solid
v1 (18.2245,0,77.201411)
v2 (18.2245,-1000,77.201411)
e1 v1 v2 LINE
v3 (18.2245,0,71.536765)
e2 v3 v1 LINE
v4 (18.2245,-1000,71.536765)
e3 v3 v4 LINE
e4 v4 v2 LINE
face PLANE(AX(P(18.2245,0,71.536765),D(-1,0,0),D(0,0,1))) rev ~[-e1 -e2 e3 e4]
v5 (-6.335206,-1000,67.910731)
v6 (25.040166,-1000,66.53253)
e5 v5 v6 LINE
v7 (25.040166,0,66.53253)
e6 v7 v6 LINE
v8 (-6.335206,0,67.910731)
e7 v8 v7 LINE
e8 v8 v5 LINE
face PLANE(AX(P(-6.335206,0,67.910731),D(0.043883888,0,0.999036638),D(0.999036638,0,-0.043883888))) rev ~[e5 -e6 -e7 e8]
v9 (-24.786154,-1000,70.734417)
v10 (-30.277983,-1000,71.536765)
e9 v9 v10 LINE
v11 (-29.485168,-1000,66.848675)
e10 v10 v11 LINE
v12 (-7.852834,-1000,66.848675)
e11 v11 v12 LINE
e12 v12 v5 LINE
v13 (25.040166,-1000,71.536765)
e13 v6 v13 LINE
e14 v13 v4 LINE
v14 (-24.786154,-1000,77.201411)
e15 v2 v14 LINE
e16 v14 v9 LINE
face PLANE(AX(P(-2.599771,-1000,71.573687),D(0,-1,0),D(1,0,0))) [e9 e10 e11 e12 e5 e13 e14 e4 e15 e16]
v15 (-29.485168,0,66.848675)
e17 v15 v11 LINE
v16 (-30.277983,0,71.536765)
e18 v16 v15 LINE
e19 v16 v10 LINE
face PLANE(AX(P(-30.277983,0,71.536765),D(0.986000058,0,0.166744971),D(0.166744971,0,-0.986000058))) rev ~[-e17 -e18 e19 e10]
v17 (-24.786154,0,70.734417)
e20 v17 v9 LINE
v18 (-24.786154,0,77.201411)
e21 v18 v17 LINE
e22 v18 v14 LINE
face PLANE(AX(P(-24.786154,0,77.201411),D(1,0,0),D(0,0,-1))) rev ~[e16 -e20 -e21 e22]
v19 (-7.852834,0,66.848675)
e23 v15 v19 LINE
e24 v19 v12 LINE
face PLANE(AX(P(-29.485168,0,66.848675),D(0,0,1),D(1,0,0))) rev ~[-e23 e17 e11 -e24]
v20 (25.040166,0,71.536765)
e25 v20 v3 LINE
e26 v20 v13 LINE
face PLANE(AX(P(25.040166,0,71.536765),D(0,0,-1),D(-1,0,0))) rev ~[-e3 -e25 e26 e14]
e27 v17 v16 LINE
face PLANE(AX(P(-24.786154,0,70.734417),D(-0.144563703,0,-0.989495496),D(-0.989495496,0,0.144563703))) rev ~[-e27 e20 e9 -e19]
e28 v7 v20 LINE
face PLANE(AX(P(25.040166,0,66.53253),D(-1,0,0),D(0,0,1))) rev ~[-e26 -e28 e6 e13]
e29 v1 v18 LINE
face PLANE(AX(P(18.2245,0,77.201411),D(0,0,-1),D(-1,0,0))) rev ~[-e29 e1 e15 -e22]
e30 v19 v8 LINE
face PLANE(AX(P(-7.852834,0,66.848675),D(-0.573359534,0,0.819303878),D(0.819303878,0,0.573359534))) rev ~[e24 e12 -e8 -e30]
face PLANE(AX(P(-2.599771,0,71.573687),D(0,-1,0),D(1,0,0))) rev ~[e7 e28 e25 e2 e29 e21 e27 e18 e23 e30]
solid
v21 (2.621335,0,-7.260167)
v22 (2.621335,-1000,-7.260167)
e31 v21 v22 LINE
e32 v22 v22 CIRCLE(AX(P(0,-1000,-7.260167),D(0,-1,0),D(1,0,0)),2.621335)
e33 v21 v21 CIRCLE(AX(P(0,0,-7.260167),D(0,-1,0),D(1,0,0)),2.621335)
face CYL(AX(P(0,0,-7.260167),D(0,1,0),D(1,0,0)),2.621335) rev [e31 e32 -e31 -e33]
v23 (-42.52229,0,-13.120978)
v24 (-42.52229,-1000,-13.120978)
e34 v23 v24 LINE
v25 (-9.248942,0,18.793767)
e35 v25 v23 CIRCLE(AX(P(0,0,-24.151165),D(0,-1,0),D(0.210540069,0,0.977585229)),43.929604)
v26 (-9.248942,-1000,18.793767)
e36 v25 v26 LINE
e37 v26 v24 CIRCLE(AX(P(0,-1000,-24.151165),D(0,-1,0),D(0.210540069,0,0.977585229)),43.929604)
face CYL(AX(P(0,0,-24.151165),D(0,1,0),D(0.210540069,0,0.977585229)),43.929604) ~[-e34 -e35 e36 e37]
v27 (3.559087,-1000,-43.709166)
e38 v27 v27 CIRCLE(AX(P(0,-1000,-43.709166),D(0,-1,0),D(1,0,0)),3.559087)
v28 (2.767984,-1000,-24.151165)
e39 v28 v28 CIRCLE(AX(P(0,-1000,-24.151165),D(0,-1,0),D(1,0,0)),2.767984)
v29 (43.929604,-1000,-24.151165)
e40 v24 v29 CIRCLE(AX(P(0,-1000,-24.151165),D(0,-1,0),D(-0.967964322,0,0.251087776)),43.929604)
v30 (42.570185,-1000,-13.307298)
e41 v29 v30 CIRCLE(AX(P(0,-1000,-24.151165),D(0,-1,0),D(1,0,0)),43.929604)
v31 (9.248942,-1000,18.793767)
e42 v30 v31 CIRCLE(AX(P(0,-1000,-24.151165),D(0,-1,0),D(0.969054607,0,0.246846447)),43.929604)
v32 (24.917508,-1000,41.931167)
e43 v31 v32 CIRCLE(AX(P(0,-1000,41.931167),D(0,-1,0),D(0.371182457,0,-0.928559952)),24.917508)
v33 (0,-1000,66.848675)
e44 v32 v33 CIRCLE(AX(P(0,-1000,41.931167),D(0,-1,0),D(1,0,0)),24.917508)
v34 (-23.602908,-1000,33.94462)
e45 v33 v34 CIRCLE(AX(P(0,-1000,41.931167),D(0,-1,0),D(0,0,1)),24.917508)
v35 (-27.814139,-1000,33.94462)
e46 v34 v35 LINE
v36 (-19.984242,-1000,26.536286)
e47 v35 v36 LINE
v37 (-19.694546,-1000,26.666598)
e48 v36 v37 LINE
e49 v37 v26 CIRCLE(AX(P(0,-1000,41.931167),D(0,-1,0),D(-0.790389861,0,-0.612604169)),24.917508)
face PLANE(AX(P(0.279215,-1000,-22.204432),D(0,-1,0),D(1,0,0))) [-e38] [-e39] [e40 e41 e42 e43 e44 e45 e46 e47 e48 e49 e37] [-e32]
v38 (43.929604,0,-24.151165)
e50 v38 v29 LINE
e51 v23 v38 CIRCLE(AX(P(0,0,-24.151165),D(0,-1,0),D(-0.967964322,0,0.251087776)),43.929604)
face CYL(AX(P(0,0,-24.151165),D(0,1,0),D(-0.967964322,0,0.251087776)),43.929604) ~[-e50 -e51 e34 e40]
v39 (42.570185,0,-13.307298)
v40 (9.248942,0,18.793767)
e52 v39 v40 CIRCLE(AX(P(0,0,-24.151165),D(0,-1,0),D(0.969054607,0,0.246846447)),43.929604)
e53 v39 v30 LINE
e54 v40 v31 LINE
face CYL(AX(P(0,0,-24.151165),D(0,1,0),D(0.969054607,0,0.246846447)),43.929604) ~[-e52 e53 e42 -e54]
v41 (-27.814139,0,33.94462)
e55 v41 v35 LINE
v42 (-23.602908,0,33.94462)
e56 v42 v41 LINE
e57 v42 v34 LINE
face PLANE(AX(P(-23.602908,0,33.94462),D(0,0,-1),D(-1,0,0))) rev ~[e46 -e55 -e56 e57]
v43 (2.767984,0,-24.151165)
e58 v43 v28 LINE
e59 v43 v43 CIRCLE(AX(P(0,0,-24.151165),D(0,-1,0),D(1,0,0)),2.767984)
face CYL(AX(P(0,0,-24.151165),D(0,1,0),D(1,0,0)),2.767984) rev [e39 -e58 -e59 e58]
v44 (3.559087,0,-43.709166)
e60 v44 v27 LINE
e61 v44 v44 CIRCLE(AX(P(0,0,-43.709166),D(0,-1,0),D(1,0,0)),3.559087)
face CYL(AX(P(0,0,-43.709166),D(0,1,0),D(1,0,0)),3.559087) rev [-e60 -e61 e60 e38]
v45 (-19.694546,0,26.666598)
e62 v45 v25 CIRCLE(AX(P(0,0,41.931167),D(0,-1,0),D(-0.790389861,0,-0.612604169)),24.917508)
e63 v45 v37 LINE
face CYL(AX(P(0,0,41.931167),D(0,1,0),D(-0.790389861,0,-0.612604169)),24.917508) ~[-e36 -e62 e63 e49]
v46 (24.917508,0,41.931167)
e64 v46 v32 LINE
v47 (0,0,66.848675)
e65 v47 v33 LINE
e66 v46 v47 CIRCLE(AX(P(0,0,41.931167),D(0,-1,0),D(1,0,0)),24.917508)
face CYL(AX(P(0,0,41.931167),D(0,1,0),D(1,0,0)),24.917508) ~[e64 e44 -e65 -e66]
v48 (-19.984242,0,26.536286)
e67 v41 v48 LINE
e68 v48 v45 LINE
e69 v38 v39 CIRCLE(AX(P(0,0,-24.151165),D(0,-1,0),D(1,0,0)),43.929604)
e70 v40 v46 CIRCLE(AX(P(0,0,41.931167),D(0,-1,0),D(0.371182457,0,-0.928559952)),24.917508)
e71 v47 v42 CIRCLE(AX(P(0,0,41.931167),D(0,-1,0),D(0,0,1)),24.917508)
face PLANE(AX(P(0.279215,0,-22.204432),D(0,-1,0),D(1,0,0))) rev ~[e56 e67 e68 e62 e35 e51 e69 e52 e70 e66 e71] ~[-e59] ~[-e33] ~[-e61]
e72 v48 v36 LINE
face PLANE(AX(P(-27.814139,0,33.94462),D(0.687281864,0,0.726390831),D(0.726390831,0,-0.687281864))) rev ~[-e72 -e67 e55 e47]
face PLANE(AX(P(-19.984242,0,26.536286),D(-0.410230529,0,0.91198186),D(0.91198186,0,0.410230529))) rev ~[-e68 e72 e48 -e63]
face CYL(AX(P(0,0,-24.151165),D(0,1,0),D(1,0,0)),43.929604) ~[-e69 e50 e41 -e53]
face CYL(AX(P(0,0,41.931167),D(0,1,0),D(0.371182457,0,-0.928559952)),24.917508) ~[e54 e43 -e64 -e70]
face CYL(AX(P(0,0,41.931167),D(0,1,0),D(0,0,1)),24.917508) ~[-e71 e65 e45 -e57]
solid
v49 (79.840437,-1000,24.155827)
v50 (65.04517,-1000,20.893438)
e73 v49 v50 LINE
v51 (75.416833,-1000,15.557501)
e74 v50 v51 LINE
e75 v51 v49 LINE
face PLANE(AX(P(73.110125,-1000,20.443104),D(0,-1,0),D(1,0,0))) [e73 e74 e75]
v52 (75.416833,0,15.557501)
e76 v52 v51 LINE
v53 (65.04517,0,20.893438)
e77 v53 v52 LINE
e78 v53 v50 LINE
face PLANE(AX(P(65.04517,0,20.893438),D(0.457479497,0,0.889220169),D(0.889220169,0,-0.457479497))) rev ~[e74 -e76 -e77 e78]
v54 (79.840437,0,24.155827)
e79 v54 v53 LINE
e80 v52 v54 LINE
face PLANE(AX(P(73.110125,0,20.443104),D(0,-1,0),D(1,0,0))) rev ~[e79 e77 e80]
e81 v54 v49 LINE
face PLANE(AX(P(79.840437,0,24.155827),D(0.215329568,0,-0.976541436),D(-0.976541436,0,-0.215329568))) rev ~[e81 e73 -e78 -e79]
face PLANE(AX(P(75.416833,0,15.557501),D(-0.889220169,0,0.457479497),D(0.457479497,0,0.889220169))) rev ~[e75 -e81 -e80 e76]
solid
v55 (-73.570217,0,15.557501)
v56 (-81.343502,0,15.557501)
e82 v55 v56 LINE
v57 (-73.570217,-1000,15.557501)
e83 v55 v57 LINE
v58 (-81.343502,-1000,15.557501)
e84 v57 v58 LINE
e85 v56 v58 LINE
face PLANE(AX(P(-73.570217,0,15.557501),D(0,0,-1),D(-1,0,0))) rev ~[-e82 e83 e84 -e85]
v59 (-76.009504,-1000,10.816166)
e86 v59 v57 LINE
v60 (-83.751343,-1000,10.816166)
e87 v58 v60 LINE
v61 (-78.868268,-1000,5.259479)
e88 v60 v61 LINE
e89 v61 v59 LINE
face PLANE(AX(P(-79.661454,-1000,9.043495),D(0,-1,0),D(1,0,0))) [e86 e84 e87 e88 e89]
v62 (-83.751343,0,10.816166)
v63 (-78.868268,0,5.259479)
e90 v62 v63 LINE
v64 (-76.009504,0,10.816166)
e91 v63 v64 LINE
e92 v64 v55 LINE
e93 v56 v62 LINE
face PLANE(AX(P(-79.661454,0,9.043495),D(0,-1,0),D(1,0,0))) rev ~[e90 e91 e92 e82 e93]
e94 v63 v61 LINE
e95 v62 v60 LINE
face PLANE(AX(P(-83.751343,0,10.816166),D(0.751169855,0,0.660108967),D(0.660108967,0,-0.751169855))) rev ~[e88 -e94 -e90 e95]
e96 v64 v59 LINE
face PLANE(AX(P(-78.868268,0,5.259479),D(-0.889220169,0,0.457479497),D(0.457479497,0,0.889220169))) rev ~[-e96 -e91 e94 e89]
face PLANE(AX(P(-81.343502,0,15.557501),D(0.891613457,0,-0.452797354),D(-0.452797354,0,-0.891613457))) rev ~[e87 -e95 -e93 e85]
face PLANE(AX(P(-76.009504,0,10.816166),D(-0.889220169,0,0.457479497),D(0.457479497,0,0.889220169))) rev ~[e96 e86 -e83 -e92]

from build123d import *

# Parameters (mm, degrees)
F0_R     = 3.559087352
F0_R_2   = 2.7679837305
F0_R_3   = 2.6213351788
F0_R_4   = 8.8899955153
F0_R_5   = 9.1287938565
F1_DEPTH = 1000


with BuildPart() as f1:
    # F0 (on Front) → F1 (new body)
    with BuildSketch(Plane.XZ):
        with BuildLine():
            ThreePointArc((-42.522289517, -13.1209784431), (-5.5598010496, -67.7275202598), (43.929604165, -24.1511650383))
            ThreePointArc((43.929604165, -24.1511650383), (43.5884245631, -18.6867925953), (42.5701853055, -13.3072983317))
            ThreePointArc((42.5701853055, -13.3072983317), (30.478272359, 7.485602118), (9.2489418796, 18.7937670981))
            ThreePointArc((9.2489418796, 18.7937670981), (0, 17.0136591141), (-9.2489418796, 18.7937670981))
            ThreePointArc((-9.2489418796, 18.7937670981), (-30.4089270744, 7.552261847), (-42.522289517, -13.1209784431))
        make_face()
        with Locations((0, -43.709166348)):
            Circle(F0_R, mode=Mode.SUBTRACT)
        with Locations((0, -24.1511650383)):
            Circle(F0_R_2, mode=Mode.SUBTRACT)
        with Locations((0, -7.2601665743)):
            Circle(F0_R_3, mode=Mode.SUBTRACT)
        with BuildLine():
            ThreePointArc((-9.2489418796, 18.7937670981), (0, 17.0136591141), (9.2489418796, 18.7937670981))
            ThreePointArc((9.2489418796, 18.7937670981), (0, 19.7784391267), (-9.2489418796, 18.7937670981))
        make_face()
        with BuildLine():
            ThreePointArc((-9.2489418796, 18.7937670981), (0, 19.7784391267), (9.2489418796, 18.7937670981))
            ThreePointArc((9.2489418796, 18.7937670981), (20.6318054946, 27.9593809067), (24.9175081308, 41.9311672449))
            ThreePointArc((24.9175081308, 41.9311672449), (17.6193389695, 59.5505062144), (0, 66.8486753757))
            ThreePointArc((0, 66.8486753757), (-20.2470624636, 56.4548951769), (-23.6029080517, 33.9446196208))
            Line((-23.6029080517, 33.9446196208), (-3.51480454, 33.9446196208))
            Line((-3.51480454, 33.9446196208), (-11.8889665349, 30.1777279181))
            Line((-11.8889665349, 30.1777279181), (-19.6945457834, 26.6665978821))
            ThreePointArc((-19.6945457834, 26.6665978821), (-14.9975576566, 22.0325372472), (-9.2489418796, 18.7937670981))
        make_face()
        with Locations((-9.0381670743, 46.3761650026)):
            Circle(F0_R_4, mode=Mode.SUBTRACT)
        with Locations((10.519833304, 46.3761650026)):
            Circle(F0_R_5, mode=Mode.SUBTRACT)
        with BuildLine():
            Line((-19.9842423259, 26.5362856785), (-19.6945457834, 26.6665978821))
            ThreePointArc((-19.6945457834, 26.6665978821), (-21.9524435373, 30.1425102311), (-23.6029080517, 33.9446196208))
            Line((-23.6029080517, 33.9446196208), (-27.814138809, 33.9446196208))
            Line((-27.814138809, 33.9446196208), (-19.9842423259, 26.5362856785))
        make_face()
        with BuildLine():
            ThreePointArc((-23.6029080517, 33.9446196208), (-21.9524435373, 30.1425102311), (-19.6945457834, 26.6665978821))
            Line((-19.6945457834, 26.6665978821), (-11.8889665349, 30.1777279181))
            Line((-11.8889665349, 30.1777279181), (-3.51480454, 33.9446196208))
            Line((-3.51480454, 33.9446196208), (-23.6029080517, 33.9446196208))
        make_face()
        with Locations((-9.0381670743, 46.3761650026)):
            Circle(F0_R_4)
        with Locations((10.519833304, 46.3761650026)):
            Circle(F0_R_5)
    extrude(amount=F1_DEPTH)


with BuildPart() as f1b:
    # F0 (on Front) → F1, piece 2 (new body)
    with BuildSketch(Plane.XZ):
        Polygon((-78.868268081, 5.2594794789), (-76.0095044971, 10.8161661774), (-83.7513430484, 10.8161661774), align=None)
        Polygon((-83.7513430484, 10.8161661774), (-76.0095044971, 10.8161661774), (-73.5702174304, 15.5575005338), (-81.3435018063, 15.5575005338), align=None)
    extrude(amount=F1_DEPTH)


with BuildPart() as f1c:
    # F0 (on Front) → F1, piece 3 (new body)
    with BuildSketch(Plane.XZ):
        Polygon((-29.4851679355, 66.8486753757), (-7.8528337181, 66.8486753757), (-6.3352061266, 67.9107309461), (25.0401664525, 66.5325298905), (25.0401664525, 71.5367647941), (18.2245001197, 71.5367647941), (18.2245001197, 77.201411128), (-24.7861540662, 77.201411128), (-24.7861540662, 70.7344174598), (-30.2779826288, 71.5367647941), align=None)
    extrude(amount=F1_DEPTH)


with BuildPart() as f1d:
    # F0 (on Front) → F1, piece 4 (new body)
    with BuildSketch(Plane.XZ):
        Polygon((65.045170486, 20.8934377879), (75.4168331623, 15.5575005338), (79.8404374607, 24.1558272027), align=None)
    extrude(amount=F1_DEPTH)


solid = Compound([f1.part, f1b.part, f1c.part, f1d.part])
